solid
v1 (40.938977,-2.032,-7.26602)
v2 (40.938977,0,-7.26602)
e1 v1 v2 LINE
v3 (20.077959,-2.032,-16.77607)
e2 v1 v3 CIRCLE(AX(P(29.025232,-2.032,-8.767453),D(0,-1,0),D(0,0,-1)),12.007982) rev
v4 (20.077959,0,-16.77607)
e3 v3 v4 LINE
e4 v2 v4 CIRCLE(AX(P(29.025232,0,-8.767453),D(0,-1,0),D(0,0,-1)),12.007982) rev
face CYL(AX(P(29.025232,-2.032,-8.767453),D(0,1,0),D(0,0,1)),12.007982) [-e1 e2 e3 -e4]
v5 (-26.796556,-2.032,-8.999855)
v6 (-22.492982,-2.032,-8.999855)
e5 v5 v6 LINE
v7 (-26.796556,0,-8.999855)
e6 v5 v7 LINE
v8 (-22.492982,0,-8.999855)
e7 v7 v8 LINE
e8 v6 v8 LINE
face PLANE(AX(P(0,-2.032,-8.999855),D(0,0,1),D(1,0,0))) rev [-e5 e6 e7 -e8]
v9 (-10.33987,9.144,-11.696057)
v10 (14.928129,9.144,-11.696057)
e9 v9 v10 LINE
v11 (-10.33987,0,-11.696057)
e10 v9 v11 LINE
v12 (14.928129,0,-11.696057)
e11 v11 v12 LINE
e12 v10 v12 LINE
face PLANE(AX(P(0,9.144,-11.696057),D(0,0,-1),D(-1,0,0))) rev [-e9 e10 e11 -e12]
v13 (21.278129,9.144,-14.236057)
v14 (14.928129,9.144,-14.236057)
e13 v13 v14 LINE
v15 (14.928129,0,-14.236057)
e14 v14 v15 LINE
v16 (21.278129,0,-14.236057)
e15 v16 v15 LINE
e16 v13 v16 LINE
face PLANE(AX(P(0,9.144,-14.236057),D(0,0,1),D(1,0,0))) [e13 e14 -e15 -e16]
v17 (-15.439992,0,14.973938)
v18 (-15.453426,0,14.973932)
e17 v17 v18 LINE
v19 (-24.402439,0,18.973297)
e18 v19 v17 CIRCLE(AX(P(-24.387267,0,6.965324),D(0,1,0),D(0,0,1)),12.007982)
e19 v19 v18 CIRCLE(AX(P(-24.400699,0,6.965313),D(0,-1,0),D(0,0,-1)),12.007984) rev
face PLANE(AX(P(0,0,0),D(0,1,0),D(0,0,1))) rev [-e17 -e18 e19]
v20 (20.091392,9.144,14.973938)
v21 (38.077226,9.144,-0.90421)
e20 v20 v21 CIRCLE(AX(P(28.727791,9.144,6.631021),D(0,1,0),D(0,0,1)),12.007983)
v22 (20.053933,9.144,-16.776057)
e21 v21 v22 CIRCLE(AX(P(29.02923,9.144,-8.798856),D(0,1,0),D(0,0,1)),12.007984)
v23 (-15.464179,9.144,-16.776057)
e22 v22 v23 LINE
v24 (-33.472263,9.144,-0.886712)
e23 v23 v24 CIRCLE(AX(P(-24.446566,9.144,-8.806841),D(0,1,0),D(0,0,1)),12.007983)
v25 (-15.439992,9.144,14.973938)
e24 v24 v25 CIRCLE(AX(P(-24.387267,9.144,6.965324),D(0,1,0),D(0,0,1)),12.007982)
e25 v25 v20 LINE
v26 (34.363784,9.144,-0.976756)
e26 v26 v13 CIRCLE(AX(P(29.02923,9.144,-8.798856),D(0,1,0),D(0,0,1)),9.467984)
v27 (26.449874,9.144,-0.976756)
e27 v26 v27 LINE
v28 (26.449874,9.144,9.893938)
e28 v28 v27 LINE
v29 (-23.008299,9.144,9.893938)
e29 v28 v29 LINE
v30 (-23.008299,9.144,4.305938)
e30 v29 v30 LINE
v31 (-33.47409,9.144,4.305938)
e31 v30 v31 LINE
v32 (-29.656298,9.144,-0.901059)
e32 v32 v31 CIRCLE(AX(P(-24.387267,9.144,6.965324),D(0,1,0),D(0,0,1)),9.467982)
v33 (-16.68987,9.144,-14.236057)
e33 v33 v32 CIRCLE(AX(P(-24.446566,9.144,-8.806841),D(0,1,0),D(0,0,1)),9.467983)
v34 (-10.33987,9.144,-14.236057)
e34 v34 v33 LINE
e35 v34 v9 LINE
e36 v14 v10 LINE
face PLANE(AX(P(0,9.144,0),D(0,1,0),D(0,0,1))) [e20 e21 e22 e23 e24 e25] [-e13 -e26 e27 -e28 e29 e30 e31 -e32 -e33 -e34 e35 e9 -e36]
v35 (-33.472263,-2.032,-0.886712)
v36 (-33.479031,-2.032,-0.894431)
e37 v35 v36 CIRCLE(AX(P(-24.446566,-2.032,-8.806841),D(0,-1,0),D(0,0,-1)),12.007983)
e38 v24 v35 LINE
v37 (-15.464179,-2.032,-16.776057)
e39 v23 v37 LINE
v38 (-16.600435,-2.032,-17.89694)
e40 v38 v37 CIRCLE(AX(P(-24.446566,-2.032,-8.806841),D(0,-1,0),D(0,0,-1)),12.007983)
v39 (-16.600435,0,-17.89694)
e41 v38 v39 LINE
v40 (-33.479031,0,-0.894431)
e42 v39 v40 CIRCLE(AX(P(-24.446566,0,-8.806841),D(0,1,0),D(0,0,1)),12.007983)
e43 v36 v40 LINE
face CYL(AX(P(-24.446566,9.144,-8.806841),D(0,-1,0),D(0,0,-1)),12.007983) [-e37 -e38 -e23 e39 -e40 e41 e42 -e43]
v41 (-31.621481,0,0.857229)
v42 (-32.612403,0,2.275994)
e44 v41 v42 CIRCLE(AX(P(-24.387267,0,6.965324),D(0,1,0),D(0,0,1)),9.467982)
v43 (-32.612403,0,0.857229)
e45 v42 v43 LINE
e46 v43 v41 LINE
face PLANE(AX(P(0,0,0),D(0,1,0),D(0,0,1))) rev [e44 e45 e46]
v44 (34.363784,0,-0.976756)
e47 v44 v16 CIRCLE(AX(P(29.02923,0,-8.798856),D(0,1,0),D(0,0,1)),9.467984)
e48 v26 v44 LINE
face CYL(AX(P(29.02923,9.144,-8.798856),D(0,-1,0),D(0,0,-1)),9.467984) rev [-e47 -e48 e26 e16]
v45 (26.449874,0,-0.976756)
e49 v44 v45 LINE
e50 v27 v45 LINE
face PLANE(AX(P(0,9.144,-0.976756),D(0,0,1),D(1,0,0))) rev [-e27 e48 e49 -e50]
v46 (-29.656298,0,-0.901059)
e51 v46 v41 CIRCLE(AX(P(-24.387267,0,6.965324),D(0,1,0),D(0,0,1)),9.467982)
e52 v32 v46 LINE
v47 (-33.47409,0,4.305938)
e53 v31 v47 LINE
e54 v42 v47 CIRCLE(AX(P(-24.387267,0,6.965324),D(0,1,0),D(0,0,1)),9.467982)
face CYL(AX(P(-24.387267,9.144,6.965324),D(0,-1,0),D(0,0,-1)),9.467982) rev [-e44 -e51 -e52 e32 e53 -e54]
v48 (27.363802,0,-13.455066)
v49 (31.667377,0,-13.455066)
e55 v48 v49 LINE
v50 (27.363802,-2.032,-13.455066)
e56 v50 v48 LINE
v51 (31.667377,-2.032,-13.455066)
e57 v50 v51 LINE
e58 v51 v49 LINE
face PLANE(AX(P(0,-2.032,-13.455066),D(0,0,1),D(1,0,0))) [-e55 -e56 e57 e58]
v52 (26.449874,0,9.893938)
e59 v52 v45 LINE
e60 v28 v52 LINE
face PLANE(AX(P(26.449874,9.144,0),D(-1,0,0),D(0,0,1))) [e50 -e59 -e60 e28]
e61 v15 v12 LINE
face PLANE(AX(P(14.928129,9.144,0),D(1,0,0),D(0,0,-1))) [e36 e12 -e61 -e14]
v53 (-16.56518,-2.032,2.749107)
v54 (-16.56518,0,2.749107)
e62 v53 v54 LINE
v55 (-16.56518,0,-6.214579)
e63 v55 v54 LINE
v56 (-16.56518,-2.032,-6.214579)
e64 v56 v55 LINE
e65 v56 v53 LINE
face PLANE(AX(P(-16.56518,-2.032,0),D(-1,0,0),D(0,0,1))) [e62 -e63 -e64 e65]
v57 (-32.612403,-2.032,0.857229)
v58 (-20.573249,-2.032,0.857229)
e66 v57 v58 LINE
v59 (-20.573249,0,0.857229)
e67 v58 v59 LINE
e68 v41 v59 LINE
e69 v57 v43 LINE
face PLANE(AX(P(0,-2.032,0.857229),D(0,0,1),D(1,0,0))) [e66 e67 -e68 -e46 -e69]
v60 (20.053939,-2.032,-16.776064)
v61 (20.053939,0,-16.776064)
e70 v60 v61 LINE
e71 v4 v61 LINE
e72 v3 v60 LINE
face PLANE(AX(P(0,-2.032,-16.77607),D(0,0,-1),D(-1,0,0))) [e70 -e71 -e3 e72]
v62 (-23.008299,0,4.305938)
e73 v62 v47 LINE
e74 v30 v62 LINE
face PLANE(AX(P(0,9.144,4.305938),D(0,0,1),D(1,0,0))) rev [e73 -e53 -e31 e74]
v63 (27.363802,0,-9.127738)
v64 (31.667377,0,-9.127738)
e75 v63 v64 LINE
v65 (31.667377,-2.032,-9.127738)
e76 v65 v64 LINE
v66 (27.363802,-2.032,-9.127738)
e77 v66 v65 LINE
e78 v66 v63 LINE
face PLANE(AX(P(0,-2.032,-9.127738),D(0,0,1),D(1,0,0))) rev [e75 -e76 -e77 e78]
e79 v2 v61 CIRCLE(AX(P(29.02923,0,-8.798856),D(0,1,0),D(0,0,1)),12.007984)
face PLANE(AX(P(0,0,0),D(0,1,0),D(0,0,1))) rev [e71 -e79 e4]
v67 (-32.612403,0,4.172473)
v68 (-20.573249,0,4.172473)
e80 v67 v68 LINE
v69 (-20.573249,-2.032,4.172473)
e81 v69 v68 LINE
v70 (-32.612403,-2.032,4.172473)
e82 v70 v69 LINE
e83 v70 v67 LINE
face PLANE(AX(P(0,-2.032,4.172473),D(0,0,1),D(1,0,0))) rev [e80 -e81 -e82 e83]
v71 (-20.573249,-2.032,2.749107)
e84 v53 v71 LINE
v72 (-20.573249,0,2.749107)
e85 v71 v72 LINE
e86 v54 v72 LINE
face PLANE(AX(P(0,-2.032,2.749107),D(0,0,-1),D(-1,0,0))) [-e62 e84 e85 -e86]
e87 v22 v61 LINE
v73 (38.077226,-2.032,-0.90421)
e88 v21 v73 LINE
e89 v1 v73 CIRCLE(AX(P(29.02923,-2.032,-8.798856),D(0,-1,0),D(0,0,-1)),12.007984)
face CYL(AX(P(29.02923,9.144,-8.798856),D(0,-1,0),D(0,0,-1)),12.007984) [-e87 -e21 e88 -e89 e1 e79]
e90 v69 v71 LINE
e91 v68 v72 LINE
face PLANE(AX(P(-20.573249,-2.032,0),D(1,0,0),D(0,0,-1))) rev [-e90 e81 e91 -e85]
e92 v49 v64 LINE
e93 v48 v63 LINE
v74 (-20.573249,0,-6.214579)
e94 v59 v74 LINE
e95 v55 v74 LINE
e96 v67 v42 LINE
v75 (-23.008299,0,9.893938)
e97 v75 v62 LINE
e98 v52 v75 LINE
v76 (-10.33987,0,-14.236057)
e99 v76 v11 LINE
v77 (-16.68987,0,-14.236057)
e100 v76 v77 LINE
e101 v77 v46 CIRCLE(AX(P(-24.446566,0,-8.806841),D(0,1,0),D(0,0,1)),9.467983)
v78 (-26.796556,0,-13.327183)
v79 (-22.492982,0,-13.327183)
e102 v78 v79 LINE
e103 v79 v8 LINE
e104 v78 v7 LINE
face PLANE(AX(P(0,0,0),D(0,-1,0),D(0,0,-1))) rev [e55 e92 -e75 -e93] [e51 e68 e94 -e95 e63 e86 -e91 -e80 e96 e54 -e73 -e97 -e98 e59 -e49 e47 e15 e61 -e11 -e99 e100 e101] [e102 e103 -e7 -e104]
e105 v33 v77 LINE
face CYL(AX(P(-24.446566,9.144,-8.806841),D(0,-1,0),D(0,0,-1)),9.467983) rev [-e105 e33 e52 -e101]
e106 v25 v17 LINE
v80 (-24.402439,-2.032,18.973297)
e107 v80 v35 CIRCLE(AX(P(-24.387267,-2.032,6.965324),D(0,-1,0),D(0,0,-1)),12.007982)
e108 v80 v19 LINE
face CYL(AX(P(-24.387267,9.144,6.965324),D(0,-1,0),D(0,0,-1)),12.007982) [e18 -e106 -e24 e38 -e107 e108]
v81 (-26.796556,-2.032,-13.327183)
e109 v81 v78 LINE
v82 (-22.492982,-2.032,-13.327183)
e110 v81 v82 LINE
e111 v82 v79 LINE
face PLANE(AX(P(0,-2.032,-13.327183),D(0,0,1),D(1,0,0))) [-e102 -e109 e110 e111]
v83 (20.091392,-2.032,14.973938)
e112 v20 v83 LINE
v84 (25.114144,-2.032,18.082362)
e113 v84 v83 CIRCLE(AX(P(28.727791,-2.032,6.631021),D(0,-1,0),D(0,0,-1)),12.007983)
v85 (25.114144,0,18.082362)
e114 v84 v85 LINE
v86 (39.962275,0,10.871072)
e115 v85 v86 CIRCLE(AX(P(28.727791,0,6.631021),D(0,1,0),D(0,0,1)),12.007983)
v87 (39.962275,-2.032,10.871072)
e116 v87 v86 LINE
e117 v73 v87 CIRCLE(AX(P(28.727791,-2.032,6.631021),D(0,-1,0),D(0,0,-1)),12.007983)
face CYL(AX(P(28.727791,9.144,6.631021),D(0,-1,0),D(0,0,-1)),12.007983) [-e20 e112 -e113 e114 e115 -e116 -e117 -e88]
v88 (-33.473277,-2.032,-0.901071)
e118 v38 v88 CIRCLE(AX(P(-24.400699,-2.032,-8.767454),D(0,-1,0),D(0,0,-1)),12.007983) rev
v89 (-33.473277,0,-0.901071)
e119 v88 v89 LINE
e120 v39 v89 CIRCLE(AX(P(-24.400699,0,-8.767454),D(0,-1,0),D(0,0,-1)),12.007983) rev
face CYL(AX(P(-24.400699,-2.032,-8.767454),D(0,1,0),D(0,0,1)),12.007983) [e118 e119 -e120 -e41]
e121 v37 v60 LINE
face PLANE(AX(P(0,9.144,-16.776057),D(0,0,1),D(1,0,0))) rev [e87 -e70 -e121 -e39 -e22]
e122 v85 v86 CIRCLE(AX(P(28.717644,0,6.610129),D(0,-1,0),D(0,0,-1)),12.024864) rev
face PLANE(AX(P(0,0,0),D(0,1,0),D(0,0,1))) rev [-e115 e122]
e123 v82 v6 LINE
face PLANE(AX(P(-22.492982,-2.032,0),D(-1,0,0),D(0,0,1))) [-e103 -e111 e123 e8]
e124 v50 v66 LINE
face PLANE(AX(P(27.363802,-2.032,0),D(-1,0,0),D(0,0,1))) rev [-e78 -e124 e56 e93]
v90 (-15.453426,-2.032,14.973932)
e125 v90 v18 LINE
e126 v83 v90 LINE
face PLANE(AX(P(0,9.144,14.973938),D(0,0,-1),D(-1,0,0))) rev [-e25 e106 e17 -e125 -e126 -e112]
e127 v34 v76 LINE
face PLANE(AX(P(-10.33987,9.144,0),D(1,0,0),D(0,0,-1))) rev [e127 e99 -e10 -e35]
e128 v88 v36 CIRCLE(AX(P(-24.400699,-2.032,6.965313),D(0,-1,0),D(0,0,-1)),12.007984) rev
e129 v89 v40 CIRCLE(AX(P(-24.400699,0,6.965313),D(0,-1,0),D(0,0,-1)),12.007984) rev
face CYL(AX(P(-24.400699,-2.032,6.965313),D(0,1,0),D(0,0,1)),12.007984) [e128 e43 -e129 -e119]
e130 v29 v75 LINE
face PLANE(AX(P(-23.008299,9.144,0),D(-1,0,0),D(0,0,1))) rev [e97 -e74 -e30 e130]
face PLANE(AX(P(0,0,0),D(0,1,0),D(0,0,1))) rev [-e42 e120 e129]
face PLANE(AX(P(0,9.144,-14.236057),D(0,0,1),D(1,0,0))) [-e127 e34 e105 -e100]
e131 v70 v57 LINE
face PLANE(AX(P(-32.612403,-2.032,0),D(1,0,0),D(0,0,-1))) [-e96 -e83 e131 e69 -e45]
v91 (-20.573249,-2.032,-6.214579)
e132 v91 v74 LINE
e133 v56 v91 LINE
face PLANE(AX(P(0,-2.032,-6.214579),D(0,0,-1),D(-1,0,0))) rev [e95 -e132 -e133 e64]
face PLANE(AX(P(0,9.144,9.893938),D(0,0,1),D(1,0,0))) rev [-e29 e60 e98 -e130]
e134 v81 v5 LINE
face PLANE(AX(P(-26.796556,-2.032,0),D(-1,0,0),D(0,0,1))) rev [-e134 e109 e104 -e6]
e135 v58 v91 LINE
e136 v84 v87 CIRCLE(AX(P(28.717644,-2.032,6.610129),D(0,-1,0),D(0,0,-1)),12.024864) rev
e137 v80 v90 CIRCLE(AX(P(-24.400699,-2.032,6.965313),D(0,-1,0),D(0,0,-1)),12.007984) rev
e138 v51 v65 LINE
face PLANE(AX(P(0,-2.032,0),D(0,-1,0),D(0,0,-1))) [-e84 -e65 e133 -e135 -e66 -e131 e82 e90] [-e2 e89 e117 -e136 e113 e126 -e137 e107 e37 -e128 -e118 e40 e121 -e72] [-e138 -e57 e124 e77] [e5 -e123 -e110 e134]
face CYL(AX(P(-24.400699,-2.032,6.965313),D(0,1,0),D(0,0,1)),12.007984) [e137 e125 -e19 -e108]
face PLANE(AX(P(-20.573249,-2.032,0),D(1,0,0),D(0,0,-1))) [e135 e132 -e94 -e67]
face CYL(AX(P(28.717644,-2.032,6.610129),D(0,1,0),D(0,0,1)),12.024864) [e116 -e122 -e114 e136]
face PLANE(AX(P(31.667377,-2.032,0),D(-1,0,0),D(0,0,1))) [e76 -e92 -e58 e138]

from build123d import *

# Parameters (mm, degrees)
SKETCH1_W               = 25.267998504
SKETCH1_H               = 2.54
BOSS_EXTRUDE7_DEPTH     = 9.144
BOSS_EXTRUDE9_START     = -2.032
BOSS_EXTRUDE9_OUTLINE_W = 4.303574795
BOSS_EXTRUDE9_OUTLINE_H = 4.327328355
BOSS_EXTRUDE9_DEPTH     = 2.032


# Read off the part's stored shape, not the designer's step: Boss-Extrude9
with BuildPart() as part:
    # Sketch1 → Boss-Extrude7 (new body)
    # profile 1 of 5: a face of its own
    with BuildSketch(Plane(origin=(0, 0, 0), x_dir=(1, 0, 0), z_dir=(0, 1, 0))):
        with BuildLine():
            ThreePointArc((20.091392362, -14.973938339), (36.674866164, -15.633001334), (38.077226225, 0.904209847))
            ThreePointArc((38.077226225, 0.904209847), (36.965236291, 17.810596862), (20.053933255, 16.7760568))
            Line((20.053933255, 16.7760568), (-15.464178996, 16.7760568))
            ThreePointArc((-15.464178996, 16.7760568), (-32.391267437, 17.810916917), (-33.472263124, 0.886712153))
            ThreePointArc((-33.472263124, 0.886712153), (-32.31789128, -15.981799893), (-15.439991882, -14.973938339))
            Line((-15.439991882, -14.973938339), (20.091392362, -14.973938339))
        make_face()
        with BuildLine():
            ThreePointArc((-29.65629843, 0.90105923), (-31.167264268, -13.573979358), (-16.658299233, -12.433938339))
            Line((-16.658299233, -12.433938339), (21.246557929, -12.433938339))
            ThreePointArc((21.246557929, -12.433938339), (35.496314389, -13.251428184), (34.363784281, 0.976755972))
            ThreePointArc((34.363784281, 0.976755972), (35.768086185, 15.449459714), (21.2781286, 14.2360568))
            Line((21.2781286, 14.2360568), (-16.689869904, 14.2360568))
            ThreePointArc((-16.689869904, 14.2360568), (-31.234591455, 15.407251461), (-29.65629843, 0.90105923))
        make_face(mode=Mode.SUBTRACT)
    # profile 2 of 5: a face of its own
    with BuildSketch(Plane(origin=(0, 0, 0), x_dir=(1, 0, 0), z_dir=(0, 1, 0))):
        with BuildLine():
            ThreePointArc((-33.474089865, -4.305938339), (-28.507587271, -15.489738966), (-16.658299233, -12.433938339))
            Line((-16.658299233, -12.433938339), (-10.339869904, -12.433938339))
            Line((-10.339869904, -12.433938339), (-10.339869904, -9.893938339))
            Line((-10.339869904, -9.893938339), (-16.658299233, -9.893938339))
            Line((-16.658299233, -9.893938339), (-23.008299233, -9.893938339))
            Line((-23.008299233, -9.893938339), (-23.008299233, -4.305938339))
            Line((-23.008299233, -4.305938339), (-33.474089865, -4.305938339))
        make_face()
    # profile 3 of 5: a face of its own
    with BuildSketch(Plane(origin=(0, 0, 0), x_dir=(1, 0, 0), z_dir=(0, 1, 0))):
        with Locations((2.294129348, -11.163938339)):
            Rectangle(SKETCH1_W, SKETCH1_H)
    # profile 4 of 5: a face of its own
    with BuildSketch(Plane(origin=(0, 0, 0), x_dir=(1, 0, 0), z_dir=(0, 1, 0))):
        with BuildLine():
            Line((14.9281286, -9.893938339), (14.9281286, -12.433938339))
            Line((14.9281286, -12.433938339), (21.246557929, -12.433938339))
            ThreePointArc((21.246557929, -12.433938339), (35.496314389, -13.251428184), (34.363784281, 0.976755972))
            Line((34.363784281, 0.976755972), (26.449874225, 0.976755972))
            Line((26.449874225, 0.976755972), (26.449874225, -9.893938339))
            Line((26.449874225, -9.893938339), (21.246557929, -9.893938339))
            Line((21.246557929, -9.893938339), (14.9281286, -9.893938339))
        make_face()
    # profile 5 of 5: a face of its own
    with BuildSketch(Plane(origin=(0, 0, 0), x_dir=(1, 0, 0), z_dir=(0, 1, 0))):
        with Locations((2.294129348, 12.9660568)):
            Rectangle(SKETCH1_W, SKETCH1_H)
    extrude(amount=BOSS_EXTRUDE7_DEPTH)

    # Boss-Extrude9 outline → Boss-Extrude9 (add)
    with BuildSketch(Plane(origin=(0, 0, 2.54), x_dir=(-1, 0, 0), z_dir=(0, 1, 0)).offset(BOSS_EXTRUDE9_START)):
        with BuildLine():
            ThreePointArc((-39.962274592, 8.331071624), (-40.584803359, 2.192889064), (-38.077226225, -3.444209847))
            ThreePointArc((-38.077226225, -3.444209847), (-39.980253201, -6.412725487), (-40.938977335, -9.806019581))
            ThreePointArc((-40.938977335, -9.806019581), (-34.00622148, -22.23363184), (-20.077959401, -19.316070247))
            Line((-20.077959401, -19.316070247), (-20.053939231, -19.316070247))
            Line((-20.053939231, -19.316070247), (15.464178996, -19.3160568))
            ThreePointArc((15.464178996, -19.3160568), (16.013662974, -19.895397798), (16.600434504, -20.436939861))
            ThreePointArc((16.600434504, -20.436939861), (32.922411354, -19.767481007), (33.473277412, -3.441071419))
            ThreePointArc((33.473277412, -3.441071419), (33.476154659, -3.437751763), (33.47903069, -3.434431054))
            ThreePointArc((33.47903069, -3.434431054), (33.475647732, -3.43057088), (33.472263124, -3.426712153))
            ThreePointArc((33.472263124, -3.426712153), (35.310098705, 9.413648761), (24.402438556, 16.433296764))
            ThreePointArc((24.402438556, 16.433296764), (19.501273126, 15.38830994), (15.453425616, 12.433931737))
            Line((15.453425616, 12.433931737), (-20.091392362, 12.433938339))
            ThreePointArc((-20.091392362, 12.433938339), (-22.408655082, 14.301808135), (-25.114144013, 15.542361937))
            ThreePointArc((-25.114144013, 15.542361937), (-33.970966426, 14.886780351), (-39.962274592, 8.331071624))
        make_face()
        with Locations((-29.515589711, -13.831402182)):
            Rectangle(BOSS_EXTRUDE9_OUTLINE_W, BOSS_EXTRUDE9_OUTLINE_H, mode=Mode.SUBTRACT)
        with Locations((24.644768928, -13.703519078)):
            Rectangle(BOSS_EXTRUDE9_OUTLINE_W, BOSS_EXTRUDE9_OUTLINE_H, mode=Mode.SUBTRACT)
        Polygon((32.612403312, 1.632473231), (32.612403312, -1.682770742), (20.573249237, -1.682770742), (20.573249237, -8.754579205), (16.565180299, -8.754579205), (16.565180299, 0.209107335), (20.573249237, 0.209107335), (20.573249237, 1.632473231), align=None, mode=Mode.SUBTRACT)
    extrude(amount=BOSS_EXTRUDE9_DEPTH)


solid = part.part
